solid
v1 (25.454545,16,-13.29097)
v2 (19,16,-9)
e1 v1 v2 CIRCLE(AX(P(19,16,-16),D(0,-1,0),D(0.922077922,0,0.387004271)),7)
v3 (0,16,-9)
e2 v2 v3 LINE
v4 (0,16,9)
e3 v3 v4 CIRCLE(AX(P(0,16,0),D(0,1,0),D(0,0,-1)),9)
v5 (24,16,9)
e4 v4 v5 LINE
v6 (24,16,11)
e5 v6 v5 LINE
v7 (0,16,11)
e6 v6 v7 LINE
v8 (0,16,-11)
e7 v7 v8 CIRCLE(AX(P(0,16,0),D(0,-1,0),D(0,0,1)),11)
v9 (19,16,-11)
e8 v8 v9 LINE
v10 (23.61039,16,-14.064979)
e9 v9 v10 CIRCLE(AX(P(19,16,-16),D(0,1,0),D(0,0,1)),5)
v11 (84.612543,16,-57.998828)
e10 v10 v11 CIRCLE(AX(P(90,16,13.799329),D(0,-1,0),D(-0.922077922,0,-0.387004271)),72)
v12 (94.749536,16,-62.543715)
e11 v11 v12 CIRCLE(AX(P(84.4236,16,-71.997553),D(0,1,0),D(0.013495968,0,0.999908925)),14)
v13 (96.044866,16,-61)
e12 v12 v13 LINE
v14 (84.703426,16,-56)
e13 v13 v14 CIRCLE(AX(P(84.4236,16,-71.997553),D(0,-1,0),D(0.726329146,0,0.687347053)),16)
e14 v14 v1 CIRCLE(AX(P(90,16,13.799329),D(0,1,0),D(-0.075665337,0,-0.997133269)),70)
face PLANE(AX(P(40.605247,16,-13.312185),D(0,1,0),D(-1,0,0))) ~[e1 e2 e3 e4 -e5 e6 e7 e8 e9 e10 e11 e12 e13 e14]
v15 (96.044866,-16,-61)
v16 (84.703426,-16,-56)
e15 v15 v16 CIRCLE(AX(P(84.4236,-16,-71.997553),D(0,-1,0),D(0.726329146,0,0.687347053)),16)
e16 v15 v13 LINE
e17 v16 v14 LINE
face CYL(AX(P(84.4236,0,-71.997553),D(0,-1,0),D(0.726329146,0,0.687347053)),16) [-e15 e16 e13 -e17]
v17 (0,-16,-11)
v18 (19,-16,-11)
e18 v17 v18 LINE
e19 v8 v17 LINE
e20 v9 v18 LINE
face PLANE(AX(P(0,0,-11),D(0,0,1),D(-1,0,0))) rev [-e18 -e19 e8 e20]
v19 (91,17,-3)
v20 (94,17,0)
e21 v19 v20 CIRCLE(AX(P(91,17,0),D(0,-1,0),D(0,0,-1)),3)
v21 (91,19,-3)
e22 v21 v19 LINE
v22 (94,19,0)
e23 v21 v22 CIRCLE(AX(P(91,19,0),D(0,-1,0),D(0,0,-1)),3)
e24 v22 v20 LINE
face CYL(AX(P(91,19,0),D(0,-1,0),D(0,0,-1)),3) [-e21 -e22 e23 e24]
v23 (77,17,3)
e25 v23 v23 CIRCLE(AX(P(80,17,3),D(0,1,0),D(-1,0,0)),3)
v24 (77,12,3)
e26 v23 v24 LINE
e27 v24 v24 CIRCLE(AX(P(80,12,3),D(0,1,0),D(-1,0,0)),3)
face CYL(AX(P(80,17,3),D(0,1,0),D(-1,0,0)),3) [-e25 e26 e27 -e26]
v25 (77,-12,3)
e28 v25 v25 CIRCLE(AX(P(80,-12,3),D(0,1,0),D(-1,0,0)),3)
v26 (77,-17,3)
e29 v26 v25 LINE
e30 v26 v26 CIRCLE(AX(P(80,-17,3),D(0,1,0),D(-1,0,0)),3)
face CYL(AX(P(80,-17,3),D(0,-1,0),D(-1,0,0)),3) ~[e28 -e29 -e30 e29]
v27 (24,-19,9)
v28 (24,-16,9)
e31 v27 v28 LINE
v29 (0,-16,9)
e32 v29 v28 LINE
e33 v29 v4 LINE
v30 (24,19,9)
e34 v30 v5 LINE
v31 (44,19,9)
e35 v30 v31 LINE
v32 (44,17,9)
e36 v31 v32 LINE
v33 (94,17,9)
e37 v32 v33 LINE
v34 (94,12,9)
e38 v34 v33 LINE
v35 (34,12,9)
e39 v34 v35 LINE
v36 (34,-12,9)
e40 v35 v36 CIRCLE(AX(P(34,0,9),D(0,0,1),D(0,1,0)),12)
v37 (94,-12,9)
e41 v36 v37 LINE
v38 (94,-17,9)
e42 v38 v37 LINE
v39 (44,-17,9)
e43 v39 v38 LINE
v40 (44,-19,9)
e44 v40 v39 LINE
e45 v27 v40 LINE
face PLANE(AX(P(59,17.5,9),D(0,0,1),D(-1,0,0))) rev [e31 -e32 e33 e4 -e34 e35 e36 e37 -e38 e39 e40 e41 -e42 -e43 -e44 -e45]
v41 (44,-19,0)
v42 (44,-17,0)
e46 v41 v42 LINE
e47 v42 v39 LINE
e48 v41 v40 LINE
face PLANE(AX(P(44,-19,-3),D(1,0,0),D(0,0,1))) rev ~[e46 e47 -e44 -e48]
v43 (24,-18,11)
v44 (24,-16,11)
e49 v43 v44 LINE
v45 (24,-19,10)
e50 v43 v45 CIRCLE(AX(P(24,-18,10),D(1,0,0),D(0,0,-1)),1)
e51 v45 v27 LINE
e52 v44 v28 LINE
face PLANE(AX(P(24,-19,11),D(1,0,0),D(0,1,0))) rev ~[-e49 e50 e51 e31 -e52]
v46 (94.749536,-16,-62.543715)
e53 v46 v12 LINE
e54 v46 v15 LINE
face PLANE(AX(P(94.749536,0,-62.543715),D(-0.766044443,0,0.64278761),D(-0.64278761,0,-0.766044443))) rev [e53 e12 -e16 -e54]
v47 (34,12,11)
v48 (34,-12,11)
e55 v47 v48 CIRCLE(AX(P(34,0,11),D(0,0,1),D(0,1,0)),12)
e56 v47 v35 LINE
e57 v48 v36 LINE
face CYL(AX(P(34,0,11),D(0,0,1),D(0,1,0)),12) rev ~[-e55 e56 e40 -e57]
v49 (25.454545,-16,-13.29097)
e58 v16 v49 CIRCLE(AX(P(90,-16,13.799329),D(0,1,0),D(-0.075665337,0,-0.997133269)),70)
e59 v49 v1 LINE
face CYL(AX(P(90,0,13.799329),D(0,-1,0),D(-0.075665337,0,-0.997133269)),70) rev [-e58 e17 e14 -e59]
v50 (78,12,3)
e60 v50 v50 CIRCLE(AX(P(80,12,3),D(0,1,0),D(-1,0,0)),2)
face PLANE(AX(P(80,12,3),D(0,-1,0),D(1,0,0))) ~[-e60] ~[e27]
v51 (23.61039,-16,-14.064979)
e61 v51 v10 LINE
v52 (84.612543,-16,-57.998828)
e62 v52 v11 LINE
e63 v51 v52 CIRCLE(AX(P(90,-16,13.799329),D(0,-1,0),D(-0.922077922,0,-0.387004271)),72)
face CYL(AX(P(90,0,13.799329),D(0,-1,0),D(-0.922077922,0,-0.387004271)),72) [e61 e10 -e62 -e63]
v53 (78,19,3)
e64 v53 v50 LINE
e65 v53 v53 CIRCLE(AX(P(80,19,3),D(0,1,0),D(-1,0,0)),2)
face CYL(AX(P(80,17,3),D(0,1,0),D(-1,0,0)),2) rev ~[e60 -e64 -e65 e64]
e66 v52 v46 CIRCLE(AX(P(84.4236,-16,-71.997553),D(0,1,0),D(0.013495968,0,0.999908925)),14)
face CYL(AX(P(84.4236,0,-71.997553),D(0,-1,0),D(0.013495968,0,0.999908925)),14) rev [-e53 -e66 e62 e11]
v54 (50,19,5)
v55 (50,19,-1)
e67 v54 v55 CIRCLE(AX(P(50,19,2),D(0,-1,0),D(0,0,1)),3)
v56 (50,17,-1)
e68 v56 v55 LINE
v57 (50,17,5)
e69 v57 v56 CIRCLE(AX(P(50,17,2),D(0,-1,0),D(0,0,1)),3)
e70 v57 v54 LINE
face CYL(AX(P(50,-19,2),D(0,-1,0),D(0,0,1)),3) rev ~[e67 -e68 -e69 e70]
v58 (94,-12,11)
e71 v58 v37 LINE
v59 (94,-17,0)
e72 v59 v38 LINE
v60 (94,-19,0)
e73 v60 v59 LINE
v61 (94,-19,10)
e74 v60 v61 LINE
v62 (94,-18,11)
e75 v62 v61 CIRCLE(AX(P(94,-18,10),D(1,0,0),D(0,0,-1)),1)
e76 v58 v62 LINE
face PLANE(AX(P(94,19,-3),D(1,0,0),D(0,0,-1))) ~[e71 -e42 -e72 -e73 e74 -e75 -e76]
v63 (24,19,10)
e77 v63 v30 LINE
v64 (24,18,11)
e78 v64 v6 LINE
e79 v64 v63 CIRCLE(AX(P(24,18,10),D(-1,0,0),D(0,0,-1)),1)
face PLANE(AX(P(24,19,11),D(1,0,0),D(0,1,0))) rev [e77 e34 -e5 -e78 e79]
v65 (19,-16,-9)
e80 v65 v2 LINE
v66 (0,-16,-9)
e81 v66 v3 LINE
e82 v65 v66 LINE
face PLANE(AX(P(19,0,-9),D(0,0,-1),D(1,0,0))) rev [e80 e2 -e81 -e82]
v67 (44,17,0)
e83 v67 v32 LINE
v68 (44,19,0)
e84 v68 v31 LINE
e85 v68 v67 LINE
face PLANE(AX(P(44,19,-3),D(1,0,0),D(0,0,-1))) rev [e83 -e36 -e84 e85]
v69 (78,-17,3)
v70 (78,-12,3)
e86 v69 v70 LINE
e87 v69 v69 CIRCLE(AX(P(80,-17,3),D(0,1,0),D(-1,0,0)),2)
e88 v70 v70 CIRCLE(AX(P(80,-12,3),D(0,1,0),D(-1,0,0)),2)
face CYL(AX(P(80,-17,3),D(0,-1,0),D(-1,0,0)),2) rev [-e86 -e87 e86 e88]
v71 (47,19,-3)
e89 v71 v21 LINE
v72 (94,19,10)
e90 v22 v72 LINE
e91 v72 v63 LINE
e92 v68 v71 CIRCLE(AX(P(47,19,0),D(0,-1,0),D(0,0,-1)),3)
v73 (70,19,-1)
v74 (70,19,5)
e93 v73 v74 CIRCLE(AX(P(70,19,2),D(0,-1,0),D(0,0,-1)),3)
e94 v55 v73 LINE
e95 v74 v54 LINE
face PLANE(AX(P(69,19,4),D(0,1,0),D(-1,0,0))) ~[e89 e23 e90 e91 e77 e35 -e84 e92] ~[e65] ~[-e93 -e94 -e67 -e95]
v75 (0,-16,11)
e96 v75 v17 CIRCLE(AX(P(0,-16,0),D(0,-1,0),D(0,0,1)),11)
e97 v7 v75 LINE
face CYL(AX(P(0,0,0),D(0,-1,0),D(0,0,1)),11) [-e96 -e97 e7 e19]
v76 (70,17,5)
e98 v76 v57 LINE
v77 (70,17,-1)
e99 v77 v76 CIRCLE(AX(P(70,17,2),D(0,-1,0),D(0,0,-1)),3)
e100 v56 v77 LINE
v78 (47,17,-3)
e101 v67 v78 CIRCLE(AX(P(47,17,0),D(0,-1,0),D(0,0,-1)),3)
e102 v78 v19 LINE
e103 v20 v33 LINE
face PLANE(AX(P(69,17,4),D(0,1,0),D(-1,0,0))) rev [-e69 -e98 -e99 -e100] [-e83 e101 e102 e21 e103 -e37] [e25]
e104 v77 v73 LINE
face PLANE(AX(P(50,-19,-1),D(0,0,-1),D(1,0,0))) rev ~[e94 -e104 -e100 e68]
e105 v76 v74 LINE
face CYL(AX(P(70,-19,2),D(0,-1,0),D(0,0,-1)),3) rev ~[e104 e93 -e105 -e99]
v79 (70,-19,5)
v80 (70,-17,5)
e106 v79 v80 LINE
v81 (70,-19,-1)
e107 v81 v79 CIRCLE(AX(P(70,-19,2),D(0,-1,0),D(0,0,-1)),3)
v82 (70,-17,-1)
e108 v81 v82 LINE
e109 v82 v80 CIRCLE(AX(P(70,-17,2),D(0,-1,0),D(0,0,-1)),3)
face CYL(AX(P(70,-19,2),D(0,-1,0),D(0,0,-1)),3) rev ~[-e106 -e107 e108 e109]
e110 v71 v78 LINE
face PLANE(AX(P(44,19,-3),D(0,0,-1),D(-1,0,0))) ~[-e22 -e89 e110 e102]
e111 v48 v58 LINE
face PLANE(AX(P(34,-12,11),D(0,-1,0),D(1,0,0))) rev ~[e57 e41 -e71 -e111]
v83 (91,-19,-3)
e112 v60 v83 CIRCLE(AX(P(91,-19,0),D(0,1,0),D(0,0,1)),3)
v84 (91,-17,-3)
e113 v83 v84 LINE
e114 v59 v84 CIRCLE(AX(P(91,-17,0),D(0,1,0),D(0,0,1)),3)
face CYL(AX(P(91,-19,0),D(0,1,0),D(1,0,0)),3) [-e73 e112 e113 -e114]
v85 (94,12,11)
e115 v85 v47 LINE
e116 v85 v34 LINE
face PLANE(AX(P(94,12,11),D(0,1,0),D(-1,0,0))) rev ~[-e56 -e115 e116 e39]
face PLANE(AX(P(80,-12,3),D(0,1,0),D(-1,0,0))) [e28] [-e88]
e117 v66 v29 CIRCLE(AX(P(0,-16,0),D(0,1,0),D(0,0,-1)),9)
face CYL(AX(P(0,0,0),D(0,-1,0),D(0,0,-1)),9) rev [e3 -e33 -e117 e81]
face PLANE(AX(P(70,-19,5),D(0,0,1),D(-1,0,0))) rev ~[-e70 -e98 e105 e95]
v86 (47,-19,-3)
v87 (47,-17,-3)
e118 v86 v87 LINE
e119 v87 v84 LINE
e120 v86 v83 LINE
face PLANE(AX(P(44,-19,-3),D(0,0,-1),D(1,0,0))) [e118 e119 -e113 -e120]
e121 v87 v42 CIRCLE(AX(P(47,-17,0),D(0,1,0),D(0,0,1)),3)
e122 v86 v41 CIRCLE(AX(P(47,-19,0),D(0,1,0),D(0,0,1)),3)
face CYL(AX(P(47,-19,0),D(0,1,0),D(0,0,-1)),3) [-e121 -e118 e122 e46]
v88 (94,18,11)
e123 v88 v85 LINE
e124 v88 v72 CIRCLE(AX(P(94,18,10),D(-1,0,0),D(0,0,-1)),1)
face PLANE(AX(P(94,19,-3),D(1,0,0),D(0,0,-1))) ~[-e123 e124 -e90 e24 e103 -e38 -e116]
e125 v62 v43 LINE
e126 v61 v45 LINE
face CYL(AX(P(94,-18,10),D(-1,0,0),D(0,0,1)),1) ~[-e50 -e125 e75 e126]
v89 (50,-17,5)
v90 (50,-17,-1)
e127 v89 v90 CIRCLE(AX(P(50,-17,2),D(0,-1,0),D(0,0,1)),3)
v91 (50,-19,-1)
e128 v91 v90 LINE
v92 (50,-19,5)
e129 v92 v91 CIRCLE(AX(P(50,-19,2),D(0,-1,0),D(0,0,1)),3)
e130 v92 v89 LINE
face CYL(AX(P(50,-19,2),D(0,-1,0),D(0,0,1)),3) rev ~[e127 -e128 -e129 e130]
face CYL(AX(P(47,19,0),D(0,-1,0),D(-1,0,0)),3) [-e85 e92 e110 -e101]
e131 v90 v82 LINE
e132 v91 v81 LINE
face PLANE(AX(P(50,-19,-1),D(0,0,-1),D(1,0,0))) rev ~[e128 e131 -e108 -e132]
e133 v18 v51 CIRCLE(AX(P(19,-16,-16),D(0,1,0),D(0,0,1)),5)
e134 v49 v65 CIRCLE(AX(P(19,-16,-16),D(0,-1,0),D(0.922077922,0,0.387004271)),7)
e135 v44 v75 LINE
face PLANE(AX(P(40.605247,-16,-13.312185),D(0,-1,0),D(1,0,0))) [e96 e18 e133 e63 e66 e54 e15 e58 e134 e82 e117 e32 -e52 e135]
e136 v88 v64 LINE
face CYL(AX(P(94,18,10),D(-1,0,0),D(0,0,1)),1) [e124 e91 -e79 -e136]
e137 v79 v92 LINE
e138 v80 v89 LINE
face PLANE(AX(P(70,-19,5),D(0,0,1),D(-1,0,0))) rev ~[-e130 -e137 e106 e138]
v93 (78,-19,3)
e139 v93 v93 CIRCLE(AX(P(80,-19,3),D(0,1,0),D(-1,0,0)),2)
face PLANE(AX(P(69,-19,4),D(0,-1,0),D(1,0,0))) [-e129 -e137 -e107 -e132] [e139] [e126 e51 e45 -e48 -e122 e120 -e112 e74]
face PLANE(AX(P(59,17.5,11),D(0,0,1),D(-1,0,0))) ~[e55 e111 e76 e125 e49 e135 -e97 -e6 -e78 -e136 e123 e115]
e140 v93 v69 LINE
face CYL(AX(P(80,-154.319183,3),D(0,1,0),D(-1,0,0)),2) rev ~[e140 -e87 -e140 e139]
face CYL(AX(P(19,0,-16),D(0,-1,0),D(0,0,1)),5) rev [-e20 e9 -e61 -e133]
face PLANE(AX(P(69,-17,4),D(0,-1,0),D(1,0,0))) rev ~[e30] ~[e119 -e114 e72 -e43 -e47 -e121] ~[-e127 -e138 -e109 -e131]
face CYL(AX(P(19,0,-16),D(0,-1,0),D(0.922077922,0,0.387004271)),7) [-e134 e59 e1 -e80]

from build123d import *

# Parameters (mm, degrees)
F1_DEPTH  = 16
F2_W      = 70
F2_H      = 3
F3_DEPTH  = 2
F4_W      = 50
F4_H      = 14
F5_DEPTH  = 2
F6_R      = 1
F9_DEPTH  = 2
F11_DEPTH = 38.001
F13_D     = 4
F14_R     = 3
F14_R_2   = 2
F15_DEPTH = 5
F16_R     = 3


# Not quite as in the source:
# - a pattern or mirror of a feature is missing from the dataset's text; its kind, count and spacing are read off the source's solid


with BuildPart() as f1:
    # F0 (on Front) → F1 (new body)
    with BuildSketch(Plane.XZ):
        with BuildLine():
            Line((94, 11), (0, 11))
            ThreePointArc((0, 11), (-11, 0), (0, -11))
            Line((0, -11), (19, -11))
            ThreePointArc((19, -11), (21.7681124643, -11.8361612201), (23.6103896104, -14.064978646))
            ThreePointArc((23.6103896104, -14.064978646), (47.9223026847, -44.6255578719), (84.6125434697, -57.9988278946))
            ThreePointArc((84.6125434697, -57.9988278946), (90.1511361286, -59.2227601314), (94.7495356371, -62.543714922))
            Line((94.7495356371, -62.543714922), (96.0448662588, -61))
            ThreePointArc((96.0448662588, -61), (90.8779784788, -57.357163598), (84.7034264019, -56))
            ThreePointArc((84.7034264019, -56), (49.0672193413, -42.9854179344), (25.4545454545, -13.2909701044))
            ThreePointArc((25.4545454545, -13.2909701044), (22.87535745, -10.1706257081), (19, -9))
            Line((19, -9), (0, -9))
            ThreePointArc((0, -9), (-9, 0), (0, 9))
            Line((0, 9), (94, 9))
            Line((94, 9), (94, 11))
        make_face()
    extrude(amount=F1_DEPTH)

    # F2 (on face) → F3 (join)
    with BuildSketch(Plane.XY.offset(11)):
        with Locations((59, -17.5)):
            Rectangle(F2_W, F2_H)
    extrude(amount=-F3_DEPTH)

    # F4 (on face) → F5 (join)
    with BuildSketch(Plane.XZ.offset(19)):
        with Locations((69, 4)):
            Rectangle(F4_W, F4_H)
    extrude(amount=-F5_DEPTH)

    # F6
    f6_edges = [f1.edges().sort_by_distance(p)[0] for p in [
        (59, -19, 11),
    ]]
    fillet(f6_edges, radius=F6_R)

    # F7: F1 across plane


with BuildPart() as f1_1:
    add(f1.part)
    add(f1.part.mirror(Plane.XZ))

    # F8 (on face) → F9 (cut)
    with BuildSketch(Plane.XY.offset(11)):
        with BuildLine():
            Line((94, 12), (34, 12))
            ThreePointArc((34, 12), (22, 0), (34, -12))
            Line((34, -12), (94, -12))
            Line((94, -12), (94, 12))
        make_face()
    extrude(amount=-F9_DEPTH, mode=Mode.SUBTRACT)

    # F10 (on face) → F11 (cut, through all)
    with BuildSketch(Plane.XZ.offset(19)):
        with BuildLine():
            ThreePointArc((50, 5), (47, 2), (50, -1))
            Line((50, -1), (70, -1))
            ThreePointArc((70, -1), (73, 2), (70, 5))
            Line((70, 5), (50, 5))
        make_face()
    extrude(amount=-F11_DEPTH, mode=Mode.SUBTRACT)

    # F13 (through all)
    with Locations(Plane.XZ.offset(19)):
        with Locations((80, 3)):
            Hole(F13_D / 2)

    # F14 (on face) → F15 (join)
    with BuildSketch(Plane(origin=(0, -17, 0), x_dir=(-1, 0, 0), z_dir=(0, 1, 0))):
        with Locations((-80, 3)):
            Circle(F14_R)
        with Locations((-80, 3)):
            Circle(F14_R_2, mode=Mode.SUBTRACT)
    f15 = extrude(amount=F15_DEPTH)

    # F15_copies: F15 across plane
    add(f15.mirror(Plane.ZX))

    # F16
    f16_edges = [f1_1.edges().sort_by_distance(p)[0] for p in [
        (94, 18, -3),
        (44, 18, -3),
        (44, -18, -3),
        (94, -18, -3),
    ]]
    fillet(f16_edges, radius=F16_R)


solid = f1_1.part
